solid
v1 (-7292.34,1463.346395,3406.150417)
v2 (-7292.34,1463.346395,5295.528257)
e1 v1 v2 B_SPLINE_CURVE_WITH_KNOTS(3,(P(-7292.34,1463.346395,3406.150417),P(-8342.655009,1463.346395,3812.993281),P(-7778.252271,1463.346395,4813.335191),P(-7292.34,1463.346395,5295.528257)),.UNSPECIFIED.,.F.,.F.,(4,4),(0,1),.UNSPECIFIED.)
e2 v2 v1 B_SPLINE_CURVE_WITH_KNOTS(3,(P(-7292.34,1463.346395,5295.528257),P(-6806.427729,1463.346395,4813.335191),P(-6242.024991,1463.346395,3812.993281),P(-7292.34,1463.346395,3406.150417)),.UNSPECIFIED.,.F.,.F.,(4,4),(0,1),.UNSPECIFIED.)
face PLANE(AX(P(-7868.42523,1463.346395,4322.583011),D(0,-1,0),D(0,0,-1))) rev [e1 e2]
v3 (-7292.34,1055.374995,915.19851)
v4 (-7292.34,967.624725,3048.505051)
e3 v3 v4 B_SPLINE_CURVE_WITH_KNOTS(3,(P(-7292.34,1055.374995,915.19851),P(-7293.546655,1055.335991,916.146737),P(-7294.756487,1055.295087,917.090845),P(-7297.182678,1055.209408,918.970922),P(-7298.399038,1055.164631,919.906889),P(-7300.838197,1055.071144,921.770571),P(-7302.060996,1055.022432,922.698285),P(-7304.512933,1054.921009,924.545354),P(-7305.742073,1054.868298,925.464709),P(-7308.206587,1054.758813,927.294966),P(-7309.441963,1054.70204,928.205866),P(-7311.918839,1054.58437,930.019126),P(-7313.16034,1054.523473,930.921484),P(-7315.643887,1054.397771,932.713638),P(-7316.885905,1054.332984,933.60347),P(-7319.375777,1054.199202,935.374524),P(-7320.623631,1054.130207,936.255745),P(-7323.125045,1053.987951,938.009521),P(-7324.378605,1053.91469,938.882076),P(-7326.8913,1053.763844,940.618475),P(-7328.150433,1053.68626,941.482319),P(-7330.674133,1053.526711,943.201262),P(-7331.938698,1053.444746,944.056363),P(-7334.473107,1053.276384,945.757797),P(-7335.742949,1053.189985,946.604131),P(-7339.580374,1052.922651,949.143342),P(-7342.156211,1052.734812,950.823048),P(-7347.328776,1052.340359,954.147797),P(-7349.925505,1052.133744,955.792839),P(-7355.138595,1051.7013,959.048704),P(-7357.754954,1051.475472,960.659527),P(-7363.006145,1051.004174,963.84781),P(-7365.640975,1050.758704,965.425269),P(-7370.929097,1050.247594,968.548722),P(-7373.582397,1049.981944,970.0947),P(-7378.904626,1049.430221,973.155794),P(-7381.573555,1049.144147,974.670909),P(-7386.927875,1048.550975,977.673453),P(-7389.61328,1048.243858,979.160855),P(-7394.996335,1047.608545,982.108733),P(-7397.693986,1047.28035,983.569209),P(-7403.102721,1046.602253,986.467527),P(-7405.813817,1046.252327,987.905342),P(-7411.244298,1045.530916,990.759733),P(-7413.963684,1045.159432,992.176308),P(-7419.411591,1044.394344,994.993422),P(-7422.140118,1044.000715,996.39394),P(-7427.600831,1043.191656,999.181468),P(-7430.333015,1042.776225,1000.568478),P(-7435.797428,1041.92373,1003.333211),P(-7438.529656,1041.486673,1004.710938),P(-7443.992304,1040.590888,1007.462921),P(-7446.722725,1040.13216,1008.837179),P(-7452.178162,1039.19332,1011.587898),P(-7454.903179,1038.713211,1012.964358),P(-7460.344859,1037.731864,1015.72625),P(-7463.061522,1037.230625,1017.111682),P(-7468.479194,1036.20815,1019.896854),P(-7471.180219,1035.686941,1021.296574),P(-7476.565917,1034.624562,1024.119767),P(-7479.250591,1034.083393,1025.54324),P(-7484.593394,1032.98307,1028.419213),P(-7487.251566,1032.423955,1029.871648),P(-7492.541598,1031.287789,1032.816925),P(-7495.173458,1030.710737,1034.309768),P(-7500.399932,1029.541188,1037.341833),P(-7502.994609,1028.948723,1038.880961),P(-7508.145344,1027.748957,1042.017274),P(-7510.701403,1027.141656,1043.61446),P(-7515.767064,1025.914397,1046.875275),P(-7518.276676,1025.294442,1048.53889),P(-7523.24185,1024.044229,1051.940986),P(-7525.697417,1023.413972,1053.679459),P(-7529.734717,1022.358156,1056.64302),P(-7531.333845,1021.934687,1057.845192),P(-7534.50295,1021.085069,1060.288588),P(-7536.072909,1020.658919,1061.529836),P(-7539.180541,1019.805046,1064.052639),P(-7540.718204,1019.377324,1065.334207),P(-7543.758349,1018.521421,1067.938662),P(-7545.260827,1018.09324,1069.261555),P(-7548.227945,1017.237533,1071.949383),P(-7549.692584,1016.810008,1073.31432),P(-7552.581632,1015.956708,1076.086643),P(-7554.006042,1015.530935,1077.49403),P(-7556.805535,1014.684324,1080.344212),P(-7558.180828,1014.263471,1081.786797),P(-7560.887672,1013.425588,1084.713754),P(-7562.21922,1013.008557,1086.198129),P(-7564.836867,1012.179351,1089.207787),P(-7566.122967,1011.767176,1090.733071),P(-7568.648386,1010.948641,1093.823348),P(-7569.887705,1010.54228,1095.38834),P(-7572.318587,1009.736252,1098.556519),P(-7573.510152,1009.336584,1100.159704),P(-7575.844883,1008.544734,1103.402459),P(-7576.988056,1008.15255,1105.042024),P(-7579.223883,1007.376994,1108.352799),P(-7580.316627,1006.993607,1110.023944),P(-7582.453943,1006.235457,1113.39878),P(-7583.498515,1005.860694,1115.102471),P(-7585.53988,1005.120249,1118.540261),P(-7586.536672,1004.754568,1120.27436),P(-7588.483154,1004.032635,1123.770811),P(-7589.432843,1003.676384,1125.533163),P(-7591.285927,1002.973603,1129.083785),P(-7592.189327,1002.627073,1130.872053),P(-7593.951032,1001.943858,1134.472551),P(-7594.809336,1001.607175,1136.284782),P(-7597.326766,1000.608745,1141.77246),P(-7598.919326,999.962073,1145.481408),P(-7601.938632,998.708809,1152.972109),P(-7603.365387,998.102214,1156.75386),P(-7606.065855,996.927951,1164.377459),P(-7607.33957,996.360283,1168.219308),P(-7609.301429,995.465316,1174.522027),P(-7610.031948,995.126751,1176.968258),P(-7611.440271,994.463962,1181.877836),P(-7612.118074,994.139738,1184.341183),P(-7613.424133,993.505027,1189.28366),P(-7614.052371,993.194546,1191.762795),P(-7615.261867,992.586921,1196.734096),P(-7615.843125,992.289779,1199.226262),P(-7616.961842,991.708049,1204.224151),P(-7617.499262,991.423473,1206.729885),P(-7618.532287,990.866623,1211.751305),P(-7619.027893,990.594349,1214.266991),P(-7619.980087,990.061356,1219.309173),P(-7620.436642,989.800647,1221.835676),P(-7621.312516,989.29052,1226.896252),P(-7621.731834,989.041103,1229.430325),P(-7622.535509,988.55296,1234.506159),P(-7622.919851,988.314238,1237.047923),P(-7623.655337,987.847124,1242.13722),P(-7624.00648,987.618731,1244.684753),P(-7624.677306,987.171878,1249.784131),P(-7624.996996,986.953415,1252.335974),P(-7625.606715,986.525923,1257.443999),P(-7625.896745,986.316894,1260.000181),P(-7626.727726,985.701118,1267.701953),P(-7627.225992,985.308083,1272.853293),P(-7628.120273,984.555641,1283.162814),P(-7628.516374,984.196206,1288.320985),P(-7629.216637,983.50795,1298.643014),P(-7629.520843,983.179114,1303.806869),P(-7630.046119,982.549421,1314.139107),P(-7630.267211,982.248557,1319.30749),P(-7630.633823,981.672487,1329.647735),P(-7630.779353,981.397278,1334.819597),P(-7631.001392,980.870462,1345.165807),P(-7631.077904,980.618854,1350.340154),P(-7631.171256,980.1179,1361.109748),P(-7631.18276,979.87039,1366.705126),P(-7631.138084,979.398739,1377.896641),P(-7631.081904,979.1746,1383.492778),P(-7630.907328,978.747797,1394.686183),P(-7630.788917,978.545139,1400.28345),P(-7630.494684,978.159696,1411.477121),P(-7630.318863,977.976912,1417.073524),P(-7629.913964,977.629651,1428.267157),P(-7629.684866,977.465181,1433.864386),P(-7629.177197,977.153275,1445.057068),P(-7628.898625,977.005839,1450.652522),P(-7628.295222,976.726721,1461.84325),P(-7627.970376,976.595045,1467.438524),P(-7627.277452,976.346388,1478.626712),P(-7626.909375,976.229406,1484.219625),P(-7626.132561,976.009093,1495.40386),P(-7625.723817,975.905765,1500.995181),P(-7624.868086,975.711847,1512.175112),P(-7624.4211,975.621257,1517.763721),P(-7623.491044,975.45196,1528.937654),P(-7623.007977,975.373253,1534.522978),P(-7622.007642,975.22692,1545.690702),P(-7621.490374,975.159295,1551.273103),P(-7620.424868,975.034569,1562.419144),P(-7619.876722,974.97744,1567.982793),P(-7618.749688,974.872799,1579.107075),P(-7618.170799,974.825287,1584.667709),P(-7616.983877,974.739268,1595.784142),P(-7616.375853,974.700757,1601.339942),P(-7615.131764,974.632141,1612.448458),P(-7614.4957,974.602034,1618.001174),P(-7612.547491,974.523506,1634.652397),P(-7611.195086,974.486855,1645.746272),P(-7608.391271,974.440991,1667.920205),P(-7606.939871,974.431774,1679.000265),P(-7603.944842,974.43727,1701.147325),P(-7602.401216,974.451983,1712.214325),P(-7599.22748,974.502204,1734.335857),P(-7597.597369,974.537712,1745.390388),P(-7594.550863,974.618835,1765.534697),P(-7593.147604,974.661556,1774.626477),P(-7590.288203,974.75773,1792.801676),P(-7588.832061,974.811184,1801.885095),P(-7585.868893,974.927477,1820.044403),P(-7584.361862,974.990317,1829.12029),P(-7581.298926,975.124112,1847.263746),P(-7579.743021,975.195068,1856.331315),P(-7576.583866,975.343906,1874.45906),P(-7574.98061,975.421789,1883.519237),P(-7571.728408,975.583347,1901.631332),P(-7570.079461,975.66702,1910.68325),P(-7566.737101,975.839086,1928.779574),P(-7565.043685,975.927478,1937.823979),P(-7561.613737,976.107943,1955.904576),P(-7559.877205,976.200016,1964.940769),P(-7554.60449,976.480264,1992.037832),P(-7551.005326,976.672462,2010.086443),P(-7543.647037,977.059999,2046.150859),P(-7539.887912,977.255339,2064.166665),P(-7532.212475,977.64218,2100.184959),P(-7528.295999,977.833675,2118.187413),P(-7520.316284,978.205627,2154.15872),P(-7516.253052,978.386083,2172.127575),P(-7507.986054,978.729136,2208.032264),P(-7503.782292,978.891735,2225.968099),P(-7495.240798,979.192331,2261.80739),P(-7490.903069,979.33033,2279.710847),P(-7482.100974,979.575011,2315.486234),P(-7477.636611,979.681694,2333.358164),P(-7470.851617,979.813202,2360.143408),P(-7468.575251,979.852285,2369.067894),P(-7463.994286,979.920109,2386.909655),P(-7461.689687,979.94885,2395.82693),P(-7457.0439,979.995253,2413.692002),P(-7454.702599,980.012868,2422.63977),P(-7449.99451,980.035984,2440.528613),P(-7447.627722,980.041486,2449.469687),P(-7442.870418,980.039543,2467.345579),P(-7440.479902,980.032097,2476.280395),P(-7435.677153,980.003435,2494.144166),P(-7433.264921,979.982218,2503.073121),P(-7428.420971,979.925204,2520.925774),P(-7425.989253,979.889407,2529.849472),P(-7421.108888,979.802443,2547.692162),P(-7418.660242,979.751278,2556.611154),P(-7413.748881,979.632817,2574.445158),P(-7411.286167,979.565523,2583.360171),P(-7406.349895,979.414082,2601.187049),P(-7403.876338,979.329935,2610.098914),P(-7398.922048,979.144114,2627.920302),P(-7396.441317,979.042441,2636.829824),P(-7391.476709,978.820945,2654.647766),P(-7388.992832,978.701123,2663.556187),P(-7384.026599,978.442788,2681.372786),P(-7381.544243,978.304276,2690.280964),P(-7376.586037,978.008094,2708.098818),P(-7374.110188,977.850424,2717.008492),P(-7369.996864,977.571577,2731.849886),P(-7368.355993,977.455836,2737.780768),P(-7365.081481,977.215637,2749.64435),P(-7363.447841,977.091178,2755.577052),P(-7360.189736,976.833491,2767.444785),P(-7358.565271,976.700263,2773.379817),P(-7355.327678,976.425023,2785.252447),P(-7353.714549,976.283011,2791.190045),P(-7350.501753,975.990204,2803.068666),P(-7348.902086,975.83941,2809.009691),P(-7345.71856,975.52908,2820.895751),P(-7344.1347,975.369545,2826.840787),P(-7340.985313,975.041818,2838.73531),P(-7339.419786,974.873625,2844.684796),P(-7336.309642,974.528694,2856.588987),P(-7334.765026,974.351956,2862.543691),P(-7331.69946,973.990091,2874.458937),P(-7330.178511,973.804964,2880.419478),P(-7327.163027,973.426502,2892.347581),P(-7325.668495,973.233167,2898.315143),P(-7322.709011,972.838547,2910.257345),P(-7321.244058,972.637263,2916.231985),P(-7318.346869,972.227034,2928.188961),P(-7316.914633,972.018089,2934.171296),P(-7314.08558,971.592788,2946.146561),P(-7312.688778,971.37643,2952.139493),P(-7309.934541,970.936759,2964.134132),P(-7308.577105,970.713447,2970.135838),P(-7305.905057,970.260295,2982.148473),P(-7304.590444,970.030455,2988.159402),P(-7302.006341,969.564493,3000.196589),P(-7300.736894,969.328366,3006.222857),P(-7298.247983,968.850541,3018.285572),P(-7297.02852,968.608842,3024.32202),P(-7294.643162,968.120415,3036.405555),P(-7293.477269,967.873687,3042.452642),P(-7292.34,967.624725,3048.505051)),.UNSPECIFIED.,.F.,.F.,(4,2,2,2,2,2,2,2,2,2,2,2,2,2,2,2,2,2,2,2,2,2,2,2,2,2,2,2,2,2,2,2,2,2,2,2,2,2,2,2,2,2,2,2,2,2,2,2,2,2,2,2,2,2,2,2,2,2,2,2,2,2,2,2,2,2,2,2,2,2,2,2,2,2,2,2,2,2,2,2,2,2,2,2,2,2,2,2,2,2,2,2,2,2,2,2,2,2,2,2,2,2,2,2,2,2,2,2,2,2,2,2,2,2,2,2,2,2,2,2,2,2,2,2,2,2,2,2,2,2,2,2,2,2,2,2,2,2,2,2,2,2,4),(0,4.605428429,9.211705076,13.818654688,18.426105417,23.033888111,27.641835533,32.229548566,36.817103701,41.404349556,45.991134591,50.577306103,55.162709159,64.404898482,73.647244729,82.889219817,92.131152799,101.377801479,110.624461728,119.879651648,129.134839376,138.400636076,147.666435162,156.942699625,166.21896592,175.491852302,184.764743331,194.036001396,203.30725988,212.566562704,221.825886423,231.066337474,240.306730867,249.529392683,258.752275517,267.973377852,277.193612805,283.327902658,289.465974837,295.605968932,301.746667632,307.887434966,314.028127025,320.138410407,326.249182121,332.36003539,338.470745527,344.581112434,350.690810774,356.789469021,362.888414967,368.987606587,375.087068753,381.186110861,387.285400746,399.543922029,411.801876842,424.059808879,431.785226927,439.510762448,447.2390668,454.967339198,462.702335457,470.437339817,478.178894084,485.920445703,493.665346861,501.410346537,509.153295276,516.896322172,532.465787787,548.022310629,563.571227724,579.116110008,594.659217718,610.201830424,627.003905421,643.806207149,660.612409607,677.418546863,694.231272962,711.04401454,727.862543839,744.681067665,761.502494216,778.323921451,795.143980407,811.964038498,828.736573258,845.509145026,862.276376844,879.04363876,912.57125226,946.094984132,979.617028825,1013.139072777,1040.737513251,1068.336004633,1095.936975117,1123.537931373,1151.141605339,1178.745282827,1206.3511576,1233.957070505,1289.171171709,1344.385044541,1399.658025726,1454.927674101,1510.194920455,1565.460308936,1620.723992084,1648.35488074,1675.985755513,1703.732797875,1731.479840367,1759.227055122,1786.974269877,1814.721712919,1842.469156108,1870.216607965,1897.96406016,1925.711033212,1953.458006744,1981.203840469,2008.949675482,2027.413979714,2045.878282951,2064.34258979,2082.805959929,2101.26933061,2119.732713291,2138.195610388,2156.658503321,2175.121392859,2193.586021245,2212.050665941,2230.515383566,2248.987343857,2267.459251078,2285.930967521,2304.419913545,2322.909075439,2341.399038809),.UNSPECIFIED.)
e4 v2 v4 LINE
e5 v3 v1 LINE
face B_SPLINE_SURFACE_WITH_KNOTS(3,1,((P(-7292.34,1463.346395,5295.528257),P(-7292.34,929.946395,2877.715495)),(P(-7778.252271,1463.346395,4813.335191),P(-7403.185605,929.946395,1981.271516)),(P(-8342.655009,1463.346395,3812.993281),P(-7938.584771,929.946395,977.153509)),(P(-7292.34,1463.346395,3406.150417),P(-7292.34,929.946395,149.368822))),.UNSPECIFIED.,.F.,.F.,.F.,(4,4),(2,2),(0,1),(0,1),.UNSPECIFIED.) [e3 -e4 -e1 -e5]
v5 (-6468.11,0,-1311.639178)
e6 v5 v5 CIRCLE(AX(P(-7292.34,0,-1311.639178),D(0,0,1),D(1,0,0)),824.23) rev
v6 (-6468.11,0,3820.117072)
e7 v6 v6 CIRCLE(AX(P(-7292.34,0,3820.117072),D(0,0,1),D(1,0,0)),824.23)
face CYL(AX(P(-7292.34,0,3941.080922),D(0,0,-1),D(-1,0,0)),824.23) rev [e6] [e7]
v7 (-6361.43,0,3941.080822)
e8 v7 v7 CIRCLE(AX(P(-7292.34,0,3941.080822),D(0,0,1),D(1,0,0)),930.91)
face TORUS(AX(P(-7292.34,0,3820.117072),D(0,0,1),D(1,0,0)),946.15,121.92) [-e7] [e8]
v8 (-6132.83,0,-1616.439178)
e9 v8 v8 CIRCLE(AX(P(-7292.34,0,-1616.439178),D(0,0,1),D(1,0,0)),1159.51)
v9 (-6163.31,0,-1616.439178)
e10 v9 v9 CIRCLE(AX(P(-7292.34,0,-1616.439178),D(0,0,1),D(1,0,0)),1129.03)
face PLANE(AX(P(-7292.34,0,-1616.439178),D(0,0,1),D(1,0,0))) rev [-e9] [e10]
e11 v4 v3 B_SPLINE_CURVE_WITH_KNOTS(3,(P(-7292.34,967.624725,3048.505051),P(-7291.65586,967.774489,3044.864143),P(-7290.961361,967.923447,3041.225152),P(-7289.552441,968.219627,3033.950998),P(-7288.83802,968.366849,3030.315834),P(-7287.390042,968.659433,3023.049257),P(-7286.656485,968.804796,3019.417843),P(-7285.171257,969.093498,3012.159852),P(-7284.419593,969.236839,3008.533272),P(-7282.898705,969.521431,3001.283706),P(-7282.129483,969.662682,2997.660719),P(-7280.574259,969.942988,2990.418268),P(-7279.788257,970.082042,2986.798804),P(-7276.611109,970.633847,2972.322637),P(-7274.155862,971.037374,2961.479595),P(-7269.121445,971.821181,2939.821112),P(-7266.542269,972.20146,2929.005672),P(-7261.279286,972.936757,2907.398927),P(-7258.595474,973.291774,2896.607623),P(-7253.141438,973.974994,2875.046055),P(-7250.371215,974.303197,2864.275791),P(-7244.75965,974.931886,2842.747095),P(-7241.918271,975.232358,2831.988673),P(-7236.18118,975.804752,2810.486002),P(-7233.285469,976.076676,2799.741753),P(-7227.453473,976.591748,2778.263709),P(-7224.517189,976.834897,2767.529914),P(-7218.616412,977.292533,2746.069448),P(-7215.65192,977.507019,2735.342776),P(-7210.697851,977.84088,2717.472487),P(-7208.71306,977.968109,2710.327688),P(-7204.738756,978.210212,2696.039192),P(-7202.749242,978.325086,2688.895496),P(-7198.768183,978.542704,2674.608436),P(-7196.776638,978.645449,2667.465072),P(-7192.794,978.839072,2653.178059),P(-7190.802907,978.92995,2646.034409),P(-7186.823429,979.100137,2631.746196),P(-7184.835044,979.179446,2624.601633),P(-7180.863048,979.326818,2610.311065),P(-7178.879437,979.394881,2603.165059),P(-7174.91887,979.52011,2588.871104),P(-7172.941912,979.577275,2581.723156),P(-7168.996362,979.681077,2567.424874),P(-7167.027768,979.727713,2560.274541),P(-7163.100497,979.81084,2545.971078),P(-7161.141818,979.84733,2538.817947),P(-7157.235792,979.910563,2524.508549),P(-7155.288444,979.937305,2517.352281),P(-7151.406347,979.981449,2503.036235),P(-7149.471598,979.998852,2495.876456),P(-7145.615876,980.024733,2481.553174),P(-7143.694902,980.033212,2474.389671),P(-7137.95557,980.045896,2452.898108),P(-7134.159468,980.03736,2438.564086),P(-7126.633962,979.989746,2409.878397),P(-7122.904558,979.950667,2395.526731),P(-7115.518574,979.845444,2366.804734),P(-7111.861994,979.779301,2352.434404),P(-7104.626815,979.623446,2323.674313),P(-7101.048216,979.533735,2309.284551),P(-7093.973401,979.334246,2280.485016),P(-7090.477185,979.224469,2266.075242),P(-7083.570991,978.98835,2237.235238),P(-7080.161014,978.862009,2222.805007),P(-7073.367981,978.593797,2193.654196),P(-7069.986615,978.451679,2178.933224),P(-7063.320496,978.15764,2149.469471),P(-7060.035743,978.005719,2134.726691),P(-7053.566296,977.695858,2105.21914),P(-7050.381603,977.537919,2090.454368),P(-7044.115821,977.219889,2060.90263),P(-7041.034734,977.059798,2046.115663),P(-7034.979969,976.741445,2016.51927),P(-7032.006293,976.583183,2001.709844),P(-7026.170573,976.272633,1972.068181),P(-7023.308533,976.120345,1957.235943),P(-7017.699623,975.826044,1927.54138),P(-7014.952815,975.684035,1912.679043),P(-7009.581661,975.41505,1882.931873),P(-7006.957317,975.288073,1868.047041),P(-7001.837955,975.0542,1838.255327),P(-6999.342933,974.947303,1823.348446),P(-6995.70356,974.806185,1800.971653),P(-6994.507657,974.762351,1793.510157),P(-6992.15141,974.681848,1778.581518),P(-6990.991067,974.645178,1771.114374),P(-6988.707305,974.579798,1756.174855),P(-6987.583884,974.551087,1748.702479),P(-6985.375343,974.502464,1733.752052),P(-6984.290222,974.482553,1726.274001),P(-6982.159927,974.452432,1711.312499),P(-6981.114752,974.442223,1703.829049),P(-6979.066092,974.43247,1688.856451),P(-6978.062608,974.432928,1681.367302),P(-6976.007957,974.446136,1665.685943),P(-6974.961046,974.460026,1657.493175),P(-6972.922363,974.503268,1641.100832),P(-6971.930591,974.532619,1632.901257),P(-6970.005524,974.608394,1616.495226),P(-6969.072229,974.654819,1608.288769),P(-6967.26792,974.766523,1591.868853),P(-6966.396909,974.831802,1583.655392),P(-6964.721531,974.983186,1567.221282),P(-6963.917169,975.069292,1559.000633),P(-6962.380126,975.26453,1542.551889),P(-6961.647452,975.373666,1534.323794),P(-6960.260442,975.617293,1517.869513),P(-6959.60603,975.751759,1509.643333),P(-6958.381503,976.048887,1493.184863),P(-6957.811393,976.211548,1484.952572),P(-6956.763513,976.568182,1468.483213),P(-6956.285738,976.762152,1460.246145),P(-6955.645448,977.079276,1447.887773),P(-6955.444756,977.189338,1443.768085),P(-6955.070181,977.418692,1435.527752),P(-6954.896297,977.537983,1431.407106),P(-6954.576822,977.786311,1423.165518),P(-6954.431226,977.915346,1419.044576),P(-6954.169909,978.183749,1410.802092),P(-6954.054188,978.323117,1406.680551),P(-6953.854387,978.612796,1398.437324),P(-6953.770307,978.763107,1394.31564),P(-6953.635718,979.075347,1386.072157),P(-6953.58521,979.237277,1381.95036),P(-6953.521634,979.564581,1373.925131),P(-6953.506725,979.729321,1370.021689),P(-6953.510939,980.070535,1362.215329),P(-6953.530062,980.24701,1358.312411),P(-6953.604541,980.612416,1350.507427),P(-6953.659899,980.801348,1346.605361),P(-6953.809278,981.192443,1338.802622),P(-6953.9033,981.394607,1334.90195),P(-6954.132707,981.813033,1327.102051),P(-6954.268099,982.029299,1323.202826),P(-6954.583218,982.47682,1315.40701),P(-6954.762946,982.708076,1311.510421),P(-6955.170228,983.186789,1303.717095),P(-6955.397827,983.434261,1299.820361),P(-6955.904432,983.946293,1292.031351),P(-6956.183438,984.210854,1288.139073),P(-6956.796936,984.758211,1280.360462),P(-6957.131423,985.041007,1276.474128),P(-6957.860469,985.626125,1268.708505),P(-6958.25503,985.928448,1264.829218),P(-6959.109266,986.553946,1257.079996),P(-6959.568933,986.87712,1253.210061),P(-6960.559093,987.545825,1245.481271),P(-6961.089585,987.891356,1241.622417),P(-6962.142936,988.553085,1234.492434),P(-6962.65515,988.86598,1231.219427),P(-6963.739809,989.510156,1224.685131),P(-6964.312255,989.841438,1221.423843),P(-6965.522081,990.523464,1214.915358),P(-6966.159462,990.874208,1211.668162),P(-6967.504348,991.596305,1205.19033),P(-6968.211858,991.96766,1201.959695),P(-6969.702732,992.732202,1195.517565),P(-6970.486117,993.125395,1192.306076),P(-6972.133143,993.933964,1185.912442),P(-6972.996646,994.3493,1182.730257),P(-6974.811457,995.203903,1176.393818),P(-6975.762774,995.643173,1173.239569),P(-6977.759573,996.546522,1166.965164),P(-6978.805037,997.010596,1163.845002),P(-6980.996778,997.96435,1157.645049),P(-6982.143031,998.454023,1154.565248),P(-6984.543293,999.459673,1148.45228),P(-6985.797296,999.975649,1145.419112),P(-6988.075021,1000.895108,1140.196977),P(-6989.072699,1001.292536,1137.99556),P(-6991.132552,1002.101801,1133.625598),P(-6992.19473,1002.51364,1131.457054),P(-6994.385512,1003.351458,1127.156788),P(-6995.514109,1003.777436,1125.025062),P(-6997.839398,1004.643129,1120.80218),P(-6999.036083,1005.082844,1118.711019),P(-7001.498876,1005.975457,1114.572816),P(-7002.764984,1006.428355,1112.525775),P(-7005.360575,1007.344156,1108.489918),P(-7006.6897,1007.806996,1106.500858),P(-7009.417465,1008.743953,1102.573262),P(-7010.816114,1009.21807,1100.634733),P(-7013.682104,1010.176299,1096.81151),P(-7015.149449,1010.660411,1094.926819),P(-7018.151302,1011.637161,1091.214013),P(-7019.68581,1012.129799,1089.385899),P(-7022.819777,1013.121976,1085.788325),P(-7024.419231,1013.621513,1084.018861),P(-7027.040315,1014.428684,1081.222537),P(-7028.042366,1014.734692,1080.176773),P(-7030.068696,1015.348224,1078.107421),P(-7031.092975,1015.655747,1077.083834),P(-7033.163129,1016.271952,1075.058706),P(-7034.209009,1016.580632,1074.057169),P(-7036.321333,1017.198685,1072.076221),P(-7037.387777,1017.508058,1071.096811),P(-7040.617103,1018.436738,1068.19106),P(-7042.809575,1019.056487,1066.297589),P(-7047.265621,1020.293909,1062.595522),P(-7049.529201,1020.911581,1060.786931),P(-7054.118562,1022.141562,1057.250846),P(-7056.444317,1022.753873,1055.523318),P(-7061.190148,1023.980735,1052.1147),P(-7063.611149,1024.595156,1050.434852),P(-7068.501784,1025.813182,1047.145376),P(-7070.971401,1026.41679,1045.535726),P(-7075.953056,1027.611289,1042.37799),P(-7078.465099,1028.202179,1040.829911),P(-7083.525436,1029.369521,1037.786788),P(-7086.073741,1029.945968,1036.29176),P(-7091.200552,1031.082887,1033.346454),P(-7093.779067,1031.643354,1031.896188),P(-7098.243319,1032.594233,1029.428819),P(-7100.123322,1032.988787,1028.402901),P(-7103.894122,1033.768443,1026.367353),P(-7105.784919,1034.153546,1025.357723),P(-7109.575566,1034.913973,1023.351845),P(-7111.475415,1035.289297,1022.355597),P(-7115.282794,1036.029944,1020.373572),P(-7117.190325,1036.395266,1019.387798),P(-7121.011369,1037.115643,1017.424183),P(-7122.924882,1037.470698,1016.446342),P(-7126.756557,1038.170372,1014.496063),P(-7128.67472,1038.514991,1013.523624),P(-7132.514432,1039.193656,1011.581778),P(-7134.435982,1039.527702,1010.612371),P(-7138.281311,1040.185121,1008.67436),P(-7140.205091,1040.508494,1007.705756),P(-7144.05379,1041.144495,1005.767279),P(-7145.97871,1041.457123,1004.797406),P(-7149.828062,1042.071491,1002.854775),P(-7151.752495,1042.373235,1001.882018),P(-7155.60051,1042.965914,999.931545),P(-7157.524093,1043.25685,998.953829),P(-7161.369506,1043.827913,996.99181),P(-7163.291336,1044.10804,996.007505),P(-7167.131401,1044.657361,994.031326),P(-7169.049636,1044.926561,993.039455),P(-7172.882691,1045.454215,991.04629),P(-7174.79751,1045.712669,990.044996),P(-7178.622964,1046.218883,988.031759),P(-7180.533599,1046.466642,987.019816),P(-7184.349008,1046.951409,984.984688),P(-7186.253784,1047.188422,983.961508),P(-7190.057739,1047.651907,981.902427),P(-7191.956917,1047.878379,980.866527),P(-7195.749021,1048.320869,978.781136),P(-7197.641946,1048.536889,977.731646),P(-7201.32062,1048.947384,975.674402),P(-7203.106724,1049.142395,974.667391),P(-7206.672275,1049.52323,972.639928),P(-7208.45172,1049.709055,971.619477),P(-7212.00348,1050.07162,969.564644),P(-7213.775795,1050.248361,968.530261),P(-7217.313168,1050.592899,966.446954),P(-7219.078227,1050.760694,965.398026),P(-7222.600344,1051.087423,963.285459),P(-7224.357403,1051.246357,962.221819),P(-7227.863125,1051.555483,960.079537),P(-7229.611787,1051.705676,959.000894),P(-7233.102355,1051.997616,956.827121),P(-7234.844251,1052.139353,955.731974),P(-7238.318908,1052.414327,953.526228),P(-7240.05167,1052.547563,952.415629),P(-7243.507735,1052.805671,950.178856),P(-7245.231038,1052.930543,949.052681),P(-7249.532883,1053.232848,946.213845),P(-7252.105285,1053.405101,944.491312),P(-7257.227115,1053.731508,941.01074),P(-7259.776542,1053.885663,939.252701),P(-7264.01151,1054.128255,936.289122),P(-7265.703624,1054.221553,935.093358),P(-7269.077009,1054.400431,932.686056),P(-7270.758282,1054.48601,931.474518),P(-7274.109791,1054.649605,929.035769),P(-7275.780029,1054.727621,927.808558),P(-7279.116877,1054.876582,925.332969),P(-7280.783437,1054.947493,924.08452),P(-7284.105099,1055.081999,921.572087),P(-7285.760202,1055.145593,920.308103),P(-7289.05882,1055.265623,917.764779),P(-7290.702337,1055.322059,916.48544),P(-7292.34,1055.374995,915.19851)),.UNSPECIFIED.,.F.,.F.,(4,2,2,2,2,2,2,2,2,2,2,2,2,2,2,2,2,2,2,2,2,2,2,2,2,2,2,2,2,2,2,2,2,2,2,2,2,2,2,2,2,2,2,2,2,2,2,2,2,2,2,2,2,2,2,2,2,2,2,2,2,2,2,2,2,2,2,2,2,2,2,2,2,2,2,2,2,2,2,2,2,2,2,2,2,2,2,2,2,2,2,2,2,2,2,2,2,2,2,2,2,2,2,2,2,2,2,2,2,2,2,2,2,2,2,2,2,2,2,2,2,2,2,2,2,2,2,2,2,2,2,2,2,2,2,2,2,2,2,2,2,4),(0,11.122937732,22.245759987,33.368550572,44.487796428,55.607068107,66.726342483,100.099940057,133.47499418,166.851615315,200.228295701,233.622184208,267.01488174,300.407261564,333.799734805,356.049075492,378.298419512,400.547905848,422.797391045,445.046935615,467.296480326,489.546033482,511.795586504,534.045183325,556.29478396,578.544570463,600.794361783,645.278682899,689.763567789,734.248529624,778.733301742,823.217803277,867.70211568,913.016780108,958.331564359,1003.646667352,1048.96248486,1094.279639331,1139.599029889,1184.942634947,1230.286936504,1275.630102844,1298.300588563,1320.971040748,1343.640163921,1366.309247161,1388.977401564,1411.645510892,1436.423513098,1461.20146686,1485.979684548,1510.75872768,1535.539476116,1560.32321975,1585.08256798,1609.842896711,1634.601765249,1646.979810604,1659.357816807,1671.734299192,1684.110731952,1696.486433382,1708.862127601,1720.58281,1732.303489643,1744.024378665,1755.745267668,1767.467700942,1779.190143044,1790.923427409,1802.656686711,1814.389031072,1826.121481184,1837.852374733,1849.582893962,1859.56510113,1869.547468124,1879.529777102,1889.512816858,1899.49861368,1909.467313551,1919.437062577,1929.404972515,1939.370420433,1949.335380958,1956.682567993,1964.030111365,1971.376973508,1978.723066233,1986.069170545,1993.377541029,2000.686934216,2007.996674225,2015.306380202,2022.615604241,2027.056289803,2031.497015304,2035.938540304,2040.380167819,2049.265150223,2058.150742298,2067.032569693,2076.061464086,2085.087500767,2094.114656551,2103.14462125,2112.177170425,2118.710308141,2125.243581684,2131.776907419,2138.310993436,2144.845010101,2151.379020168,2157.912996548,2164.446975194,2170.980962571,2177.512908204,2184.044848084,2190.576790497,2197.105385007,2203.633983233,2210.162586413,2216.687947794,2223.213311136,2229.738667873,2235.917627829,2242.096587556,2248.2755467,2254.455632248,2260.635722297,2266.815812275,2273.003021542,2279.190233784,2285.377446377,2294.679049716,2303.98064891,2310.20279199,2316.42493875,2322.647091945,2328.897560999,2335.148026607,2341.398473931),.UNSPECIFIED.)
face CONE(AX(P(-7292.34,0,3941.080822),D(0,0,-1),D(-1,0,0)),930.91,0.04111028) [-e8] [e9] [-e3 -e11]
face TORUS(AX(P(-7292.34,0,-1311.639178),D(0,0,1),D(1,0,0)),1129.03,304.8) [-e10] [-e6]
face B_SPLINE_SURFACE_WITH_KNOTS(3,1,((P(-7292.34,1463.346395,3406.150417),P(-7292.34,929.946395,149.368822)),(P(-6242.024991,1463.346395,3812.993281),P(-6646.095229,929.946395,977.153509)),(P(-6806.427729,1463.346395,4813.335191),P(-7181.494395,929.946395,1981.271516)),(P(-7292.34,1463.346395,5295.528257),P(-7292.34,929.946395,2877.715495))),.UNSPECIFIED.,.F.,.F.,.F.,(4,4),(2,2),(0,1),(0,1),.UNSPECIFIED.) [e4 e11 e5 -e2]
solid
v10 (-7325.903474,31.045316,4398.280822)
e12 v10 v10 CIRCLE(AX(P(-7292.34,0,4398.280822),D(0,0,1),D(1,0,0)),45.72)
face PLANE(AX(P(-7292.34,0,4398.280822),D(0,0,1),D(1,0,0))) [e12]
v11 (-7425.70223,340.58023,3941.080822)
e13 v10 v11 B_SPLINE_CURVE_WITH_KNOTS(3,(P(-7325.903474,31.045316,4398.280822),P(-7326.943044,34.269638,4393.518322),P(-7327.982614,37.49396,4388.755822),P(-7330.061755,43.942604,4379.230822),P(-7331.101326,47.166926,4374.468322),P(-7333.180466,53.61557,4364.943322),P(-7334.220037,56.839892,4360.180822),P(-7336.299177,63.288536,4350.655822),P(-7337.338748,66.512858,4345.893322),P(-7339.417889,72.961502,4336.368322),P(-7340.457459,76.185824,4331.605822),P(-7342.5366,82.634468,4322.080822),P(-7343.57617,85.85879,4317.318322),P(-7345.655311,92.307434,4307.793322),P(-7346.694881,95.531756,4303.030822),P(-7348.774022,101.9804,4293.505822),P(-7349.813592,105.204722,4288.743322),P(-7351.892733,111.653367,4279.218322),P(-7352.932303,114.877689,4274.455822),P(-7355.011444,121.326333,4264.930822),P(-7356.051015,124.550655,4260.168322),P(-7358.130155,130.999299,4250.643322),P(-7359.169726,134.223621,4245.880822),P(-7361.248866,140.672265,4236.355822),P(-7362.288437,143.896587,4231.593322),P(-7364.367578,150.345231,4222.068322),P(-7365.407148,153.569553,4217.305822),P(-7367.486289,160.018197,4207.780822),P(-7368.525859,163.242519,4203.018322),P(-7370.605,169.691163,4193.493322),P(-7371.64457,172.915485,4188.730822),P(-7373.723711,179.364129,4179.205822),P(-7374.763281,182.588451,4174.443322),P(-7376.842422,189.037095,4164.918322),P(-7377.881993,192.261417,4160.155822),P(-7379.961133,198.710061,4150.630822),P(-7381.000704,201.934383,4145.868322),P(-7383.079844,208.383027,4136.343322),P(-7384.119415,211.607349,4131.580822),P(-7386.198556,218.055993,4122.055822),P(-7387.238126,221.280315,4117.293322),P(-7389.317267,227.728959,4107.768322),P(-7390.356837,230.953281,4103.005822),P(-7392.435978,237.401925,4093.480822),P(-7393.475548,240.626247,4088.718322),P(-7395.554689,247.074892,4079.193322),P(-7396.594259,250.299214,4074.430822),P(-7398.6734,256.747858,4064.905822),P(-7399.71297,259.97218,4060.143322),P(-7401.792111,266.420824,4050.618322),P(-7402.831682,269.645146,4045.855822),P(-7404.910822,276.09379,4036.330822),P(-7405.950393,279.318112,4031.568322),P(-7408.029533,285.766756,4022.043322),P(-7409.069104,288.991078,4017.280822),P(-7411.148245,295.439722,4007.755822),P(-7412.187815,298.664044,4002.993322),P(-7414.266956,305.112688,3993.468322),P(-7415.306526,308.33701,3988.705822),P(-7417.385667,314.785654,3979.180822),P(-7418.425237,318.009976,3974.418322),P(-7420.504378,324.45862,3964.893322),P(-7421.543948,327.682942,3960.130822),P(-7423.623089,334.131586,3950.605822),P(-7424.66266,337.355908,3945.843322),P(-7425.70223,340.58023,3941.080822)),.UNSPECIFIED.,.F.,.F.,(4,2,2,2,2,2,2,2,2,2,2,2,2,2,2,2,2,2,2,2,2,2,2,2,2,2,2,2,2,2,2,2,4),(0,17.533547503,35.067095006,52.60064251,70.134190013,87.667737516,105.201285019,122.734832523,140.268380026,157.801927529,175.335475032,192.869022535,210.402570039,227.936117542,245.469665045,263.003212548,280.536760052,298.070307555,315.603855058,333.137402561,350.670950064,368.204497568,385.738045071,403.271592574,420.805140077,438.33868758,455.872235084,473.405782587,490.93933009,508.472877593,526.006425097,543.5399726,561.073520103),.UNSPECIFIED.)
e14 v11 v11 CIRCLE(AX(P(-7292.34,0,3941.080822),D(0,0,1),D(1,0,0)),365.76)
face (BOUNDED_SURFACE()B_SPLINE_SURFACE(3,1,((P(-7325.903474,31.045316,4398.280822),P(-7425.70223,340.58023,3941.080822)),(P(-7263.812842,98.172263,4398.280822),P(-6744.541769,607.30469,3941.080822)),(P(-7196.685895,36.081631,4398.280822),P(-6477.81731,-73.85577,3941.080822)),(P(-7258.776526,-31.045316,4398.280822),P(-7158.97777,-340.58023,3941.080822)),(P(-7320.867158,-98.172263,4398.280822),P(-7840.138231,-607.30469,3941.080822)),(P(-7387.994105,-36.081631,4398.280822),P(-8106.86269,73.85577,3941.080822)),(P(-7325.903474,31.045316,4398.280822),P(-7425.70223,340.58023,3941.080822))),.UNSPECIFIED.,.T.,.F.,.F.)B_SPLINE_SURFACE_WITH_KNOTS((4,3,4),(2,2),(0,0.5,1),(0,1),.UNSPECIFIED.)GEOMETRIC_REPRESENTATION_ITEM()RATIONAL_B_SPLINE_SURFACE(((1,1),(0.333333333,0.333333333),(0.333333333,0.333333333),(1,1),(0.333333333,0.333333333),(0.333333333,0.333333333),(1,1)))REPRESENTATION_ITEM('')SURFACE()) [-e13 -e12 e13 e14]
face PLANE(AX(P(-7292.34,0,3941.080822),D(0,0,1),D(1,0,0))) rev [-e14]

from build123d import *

# Parameters (mm, degrees)
SKETCH13_R              = 1159.51
SKETCH14_R              = 930.91
CUT_EXTRUDE1_DEPTH      = 10182.564733185
CUT_EXTRUDE1_DEPTH_BACK = 10182.564733185
SKETCH16_R              = 824.23
FILLET1_R               = 304.8
FILLET2_R               = 121.92


with BuildPart() as part:
    # Sketch13 → Loft2 section 0
    with BuildSketch(Plane.XY.offset(-1616.439178421)):
        with Locations((-7292.34, 0)):
            Circle(SKETCH13_R)
    # Sketch14 → Loft2 section 1
    with BuildSketch(Plane.XY.offset(3941.080821579)):
        with Locations((-7292.34, 0)):
            Circle(SKETCH14_R)
    loft()

    # Sketch16 → Cut-Extrude1 (cut, two sides: drawn at the far end of the back side and taken through both)
    with BuildSketch(Plane(origin=(0, 0, -1616.439178421), x_dir=(-1, 0, 0), z_dir=(0, 0, -1)).offset(-CUT_EXTRUDE1_DEPTH_BACK)):
        with Locations(Location((7292.34, 0, 0), (0, 0, 180))):
            Circle(SKETCH16_R)
    extrude(amount=CUT_EXTRUDE1_DEPTH + CUT_EXTRUDE1_DEPTH_BACK, mode=Mode.SUBTRACT)

    # Fillet1
    fillet1_edges = [part.edges().sort_by_distance(p)[0] for p in [
        (-8116.57, 0, -1616.439178421),
    ]]
    fillet(fillet1_edges, radius=FILLET1_R)

    # Fillet2
    # the kernel refuses this fillet: 121.92 mm, written as the material it takes off along each edge
    with BuildSketch(Plane(origin=(-7292.34, 0, 3941.080821579), x_dir=(1, 0, 0), z_dir=(0, 1, 0))) as fillet2_piece_1:
        with BuildLine():
            CenterArc((946.15, 120.963749942), FILLET2_R, 180, 82.819244219)
            Line((930.91, 0), (930.6052, -2.419274999))
            ThreePointArc((930.6052, -2.419274999), (877.57, -2.4384), (824.23, -2.4384))
            Line((824.23, -2.4384), (821.7916, 0))
            Line((821.7916, 0), (821.7916, 120.963749942))
            Line((821.7916, 120.963749942), (824.23, 120.963749942))
        make_face()
    revolve(axis=Axis((-7292.34, 0, 3941.080821579), (0, 0, -1)), mode=Mode.SUBTRACT)

    # Sketch20 → Loft4 section 0
    with BuildSketch(Plane(origin=(0, 1463.346394626, 0), x_dir=(1, 0, 0), z_dir=(0, 1, 0))):
        with BuildLine():
            add(Edge.make_bspline(
                [(-7292.34, -3406.150417238), (-6242.02499115, -3812.9932806), (-6806.427729263, -4813.335190791), (-7292.34, -5295.528257059)],
                knots=[0, 0, 0, 0, 1, 1, 1, 1], degree=3))
            add(Edge.make_bspline(
                [(-7292.34, -3406.150417238), (-8342.65500885, -3812.9932806), (-7778.252270737, -4813.335190791), (-7292.34, -5295.528257059)],
                knots=[0, 0, 0, 0, 1, 1, 1, 1], degree=3))
        make_face()
    # Sketch17 → Loft4 section 1
    with BuildSketch(Plane(origin=(0, 929.946394626, 0), x_dir=(1, 0, 0), z_dir=(0, 1, 0))):
        with BuildLine():
            add(Edge.make_bspline(
                [(-7292.34, -149.368821579), (-6646.095228766, -977.153508768), (-7181.494395174, -1981.271516216), (-7292.34, -2877.715495293)],
                knots=[0, 0, 0, 0, 1, 1, 1, 1], degree=3))
            add(Edge.make_bspline(
                [(-7292.34, -149.368821579), (-7938.584771234, -977.153508768), (-7403.185604826, -1981.271516216), (-7292.34, -2877.715495293)],
                knots=[0, 0, 0, 0, 1, 1, 1, 1], degree=3))
        make_face()
    loft()


with BuildPart() as body_2:
    # Loft3: read off the stored shape, not the designer's step
    # Loft3: loft between two sections, ruled curve by curve
    loft3_from = [
        Edge.make_bspline([(-7325.903473614, 31.045315894, 4398.280821579), (-7263.812841827, 98.172263122, 4398.280821579), (-7196.685894598, 36.081631335, 4398.280821579), (-7258.776526386, -31.045315894, 4398.280821579), (-7320.867158173, -98.172263122, 4398.280821579), (-7387.994105402, -36.081631335, 4398.280821579), (-7325.903473614, 31.045315894, 4398.280821579)], [0, 0, 0, 0, 0.5, 0.5, 0.5, 1, 1, 1, 1], 3, [1, 0.333333333, 0.333333333, 1, 0.333333333, 0.333333333, 1]),
    ]
    loft3_to = [
        Edge.make_bspline([(-7425.702229898, 340.580230249, 3941.080821579), (-6744.5417694, 607.304690046, 3941.080821579), (-6477.817309603, -73.855770452, 3941.080821579), (-7158.977770102, -340.580230249, 3941.080821579), (-7840.1382306, -607.304690046, 3941.080821579), (-8106.862690397, 73.855770452, 3941.080821579), (-7425.702229898, 340.580230249, 3941.080821579)], [0, 0, 0, 0, 0.5, 0.5, 0.5, 1, 1, 1, 1], 3, [1, 0.333333333, 0.333333333, 1, 0.333333333, 0.333333333, 1]),
    ]
    loft3 = Solid(Shell([*[Face.make_surface_from_curves(loft3_from[k], loft3_to[k]) for k in range(1)], Face(Wire(loft3_from)), Face(Wire(loft3_to))]))
    add(loft3)


solid = Compound([part.part, body_2.part])
